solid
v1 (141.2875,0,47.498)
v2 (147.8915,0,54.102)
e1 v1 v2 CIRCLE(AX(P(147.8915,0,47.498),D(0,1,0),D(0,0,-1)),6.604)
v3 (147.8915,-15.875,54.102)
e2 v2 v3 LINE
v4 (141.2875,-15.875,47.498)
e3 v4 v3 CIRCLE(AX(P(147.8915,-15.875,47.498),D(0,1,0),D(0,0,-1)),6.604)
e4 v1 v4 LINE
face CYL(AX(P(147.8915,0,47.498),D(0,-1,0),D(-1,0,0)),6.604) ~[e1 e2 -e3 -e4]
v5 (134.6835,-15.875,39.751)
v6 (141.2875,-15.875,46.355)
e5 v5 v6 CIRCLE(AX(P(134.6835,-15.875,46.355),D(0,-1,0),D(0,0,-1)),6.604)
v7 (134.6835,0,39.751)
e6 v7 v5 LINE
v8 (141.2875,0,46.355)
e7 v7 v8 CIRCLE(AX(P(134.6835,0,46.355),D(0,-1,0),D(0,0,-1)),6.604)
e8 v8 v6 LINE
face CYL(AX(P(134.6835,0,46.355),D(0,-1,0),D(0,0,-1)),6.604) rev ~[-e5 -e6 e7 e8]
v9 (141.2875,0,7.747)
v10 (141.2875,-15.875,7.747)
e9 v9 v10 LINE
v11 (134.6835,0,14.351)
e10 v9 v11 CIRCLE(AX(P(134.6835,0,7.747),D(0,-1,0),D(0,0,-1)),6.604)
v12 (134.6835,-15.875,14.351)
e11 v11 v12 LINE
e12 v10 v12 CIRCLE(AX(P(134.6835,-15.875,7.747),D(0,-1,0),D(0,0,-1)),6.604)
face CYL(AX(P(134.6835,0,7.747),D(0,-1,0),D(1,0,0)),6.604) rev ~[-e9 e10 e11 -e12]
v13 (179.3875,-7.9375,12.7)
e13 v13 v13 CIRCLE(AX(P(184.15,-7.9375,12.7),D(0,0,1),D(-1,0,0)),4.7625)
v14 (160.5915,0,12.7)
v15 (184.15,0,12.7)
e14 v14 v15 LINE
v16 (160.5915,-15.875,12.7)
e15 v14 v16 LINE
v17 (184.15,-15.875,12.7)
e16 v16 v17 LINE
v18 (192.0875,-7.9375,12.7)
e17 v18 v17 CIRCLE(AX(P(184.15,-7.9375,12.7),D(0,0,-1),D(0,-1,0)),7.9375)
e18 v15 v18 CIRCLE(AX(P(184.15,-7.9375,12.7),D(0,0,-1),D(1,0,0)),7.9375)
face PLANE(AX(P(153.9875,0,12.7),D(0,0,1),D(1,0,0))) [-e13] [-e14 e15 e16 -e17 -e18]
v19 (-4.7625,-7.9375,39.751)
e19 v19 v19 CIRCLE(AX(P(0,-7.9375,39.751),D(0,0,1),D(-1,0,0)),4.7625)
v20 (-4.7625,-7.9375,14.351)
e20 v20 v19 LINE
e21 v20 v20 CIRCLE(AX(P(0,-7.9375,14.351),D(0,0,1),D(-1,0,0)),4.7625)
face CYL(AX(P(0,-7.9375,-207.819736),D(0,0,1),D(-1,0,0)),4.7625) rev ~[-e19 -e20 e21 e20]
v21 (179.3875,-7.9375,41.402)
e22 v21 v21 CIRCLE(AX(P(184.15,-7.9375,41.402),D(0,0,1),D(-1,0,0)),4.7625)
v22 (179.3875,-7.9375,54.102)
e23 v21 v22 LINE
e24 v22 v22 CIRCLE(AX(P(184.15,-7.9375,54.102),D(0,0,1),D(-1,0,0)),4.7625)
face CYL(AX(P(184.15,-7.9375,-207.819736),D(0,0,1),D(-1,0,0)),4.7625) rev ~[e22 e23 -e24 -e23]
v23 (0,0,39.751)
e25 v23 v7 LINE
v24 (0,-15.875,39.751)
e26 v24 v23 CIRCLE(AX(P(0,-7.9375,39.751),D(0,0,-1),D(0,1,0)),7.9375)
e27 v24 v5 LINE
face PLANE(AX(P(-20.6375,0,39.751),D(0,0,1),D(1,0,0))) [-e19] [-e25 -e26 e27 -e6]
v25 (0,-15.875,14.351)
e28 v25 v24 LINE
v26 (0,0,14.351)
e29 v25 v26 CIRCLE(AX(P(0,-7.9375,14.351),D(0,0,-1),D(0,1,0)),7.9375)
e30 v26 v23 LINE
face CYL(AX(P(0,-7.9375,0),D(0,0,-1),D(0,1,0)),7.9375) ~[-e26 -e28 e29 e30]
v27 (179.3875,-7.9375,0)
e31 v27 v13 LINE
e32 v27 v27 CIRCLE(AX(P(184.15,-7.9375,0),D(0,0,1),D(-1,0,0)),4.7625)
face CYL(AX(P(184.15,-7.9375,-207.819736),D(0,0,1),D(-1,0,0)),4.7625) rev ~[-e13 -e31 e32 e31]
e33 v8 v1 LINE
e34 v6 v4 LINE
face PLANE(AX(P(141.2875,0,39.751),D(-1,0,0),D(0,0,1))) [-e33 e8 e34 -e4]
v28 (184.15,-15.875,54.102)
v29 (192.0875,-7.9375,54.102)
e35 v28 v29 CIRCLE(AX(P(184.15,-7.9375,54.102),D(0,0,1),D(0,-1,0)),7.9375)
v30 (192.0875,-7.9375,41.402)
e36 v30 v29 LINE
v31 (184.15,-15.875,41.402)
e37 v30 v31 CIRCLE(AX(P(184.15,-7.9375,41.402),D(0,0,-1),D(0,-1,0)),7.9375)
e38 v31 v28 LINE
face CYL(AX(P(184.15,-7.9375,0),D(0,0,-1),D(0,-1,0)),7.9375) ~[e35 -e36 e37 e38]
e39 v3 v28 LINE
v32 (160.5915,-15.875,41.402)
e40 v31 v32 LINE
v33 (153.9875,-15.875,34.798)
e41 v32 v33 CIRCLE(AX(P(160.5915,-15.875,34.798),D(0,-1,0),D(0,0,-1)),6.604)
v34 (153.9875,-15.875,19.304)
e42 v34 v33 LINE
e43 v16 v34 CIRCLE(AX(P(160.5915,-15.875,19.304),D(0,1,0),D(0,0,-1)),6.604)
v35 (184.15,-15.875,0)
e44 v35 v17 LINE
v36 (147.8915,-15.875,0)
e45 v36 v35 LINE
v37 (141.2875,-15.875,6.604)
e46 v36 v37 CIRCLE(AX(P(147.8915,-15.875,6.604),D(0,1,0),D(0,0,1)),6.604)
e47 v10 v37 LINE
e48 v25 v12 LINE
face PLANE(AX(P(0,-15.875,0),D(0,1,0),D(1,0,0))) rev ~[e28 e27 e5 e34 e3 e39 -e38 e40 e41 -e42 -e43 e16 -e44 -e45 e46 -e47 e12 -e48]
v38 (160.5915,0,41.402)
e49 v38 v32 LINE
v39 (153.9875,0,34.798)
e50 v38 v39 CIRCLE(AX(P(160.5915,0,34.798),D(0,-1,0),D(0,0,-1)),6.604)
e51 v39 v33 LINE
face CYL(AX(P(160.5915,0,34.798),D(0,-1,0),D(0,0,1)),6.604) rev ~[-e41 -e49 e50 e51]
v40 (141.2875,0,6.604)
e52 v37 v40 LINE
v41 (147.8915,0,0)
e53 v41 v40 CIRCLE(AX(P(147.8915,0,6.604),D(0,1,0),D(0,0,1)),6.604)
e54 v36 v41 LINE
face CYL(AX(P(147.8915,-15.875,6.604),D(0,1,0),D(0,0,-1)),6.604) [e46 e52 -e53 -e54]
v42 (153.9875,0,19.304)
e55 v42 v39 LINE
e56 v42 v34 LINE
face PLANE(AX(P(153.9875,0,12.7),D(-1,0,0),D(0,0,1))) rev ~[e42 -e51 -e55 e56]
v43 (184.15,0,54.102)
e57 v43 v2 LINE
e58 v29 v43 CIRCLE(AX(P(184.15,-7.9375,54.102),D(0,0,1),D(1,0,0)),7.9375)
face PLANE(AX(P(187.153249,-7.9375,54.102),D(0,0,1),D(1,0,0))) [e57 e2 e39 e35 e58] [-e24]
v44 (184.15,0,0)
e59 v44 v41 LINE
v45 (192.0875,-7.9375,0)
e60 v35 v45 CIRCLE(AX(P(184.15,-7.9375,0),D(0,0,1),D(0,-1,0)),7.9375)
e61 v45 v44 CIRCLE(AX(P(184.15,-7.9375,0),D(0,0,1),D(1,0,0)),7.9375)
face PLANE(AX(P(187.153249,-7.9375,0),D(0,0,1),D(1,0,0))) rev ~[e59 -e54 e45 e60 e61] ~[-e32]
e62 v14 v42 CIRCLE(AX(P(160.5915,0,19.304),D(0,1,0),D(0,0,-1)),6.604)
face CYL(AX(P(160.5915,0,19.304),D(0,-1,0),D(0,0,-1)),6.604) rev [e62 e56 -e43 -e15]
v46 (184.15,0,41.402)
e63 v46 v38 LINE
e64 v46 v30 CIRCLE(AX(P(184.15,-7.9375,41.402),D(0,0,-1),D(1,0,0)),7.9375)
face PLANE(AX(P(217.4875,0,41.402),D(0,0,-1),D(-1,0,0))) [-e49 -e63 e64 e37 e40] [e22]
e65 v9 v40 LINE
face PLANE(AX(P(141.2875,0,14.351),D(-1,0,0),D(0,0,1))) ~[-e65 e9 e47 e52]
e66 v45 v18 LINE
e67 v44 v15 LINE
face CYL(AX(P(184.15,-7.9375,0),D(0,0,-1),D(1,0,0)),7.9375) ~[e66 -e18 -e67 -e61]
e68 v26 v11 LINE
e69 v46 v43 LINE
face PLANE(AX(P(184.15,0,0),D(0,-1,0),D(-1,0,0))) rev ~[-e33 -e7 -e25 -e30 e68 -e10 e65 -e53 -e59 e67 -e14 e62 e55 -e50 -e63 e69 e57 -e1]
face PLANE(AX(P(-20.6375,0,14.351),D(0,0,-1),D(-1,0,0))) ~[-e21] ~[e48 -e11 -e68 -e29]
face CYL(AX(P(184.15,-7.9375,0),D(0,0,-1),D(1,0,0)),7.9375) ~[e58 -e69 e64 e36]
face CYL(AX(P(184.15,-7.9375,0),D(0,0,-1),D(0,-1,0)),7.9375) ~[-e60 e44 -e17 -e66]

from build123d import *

# Parameters (mm, degrees)
F1_DEPTH = 54.102
F2_D     = 9.525
F3_W     = 25.4
F3_H     = 28.702
F3_W_2   = 38.1
F4_DEPTH = 25.4
F5_R     = 6.604
F6_W     = 141.2875
F6_H     = 14.351
F6_W_2   = 7.9375
F7_DEPTH = 25.4
F9_R     = 6.604


# Not quite as in the source:
# - a pattern or mirror of a feature is missing from the dataset's text; its kind, count and spacing are read off the source's solid


with BuildPart() as f1:
    # F0 (on Top) → F1 (new body)
    with BuildSketch(Plane.XY):
        with BuildLine():
            ThreePointArc((192.0875, -7.9375), (189.7626600757, -2.3248399243), (184.15, 0))
            Line((184.15, 0), (184.15, -15.875))
            ThreePointArc((184.15, -15.875), (189.7626600757, -13.5501600757), (192.0875, -7.9375))
        make_face()
        with BuildLine():
            Line((184.15, -15.875), (184.15, 0))
            ThreePointArc((184.15, 0), (176.2125, -7.9375), (184.15, -15.875))
        make_face()
        with BuildLine():
            Line((184.15, 0), (0, 0))
            ThreePointArc((0, 0), (5.6126600757, -2.3248399243), (7.9375, -7.9375))
            ThreePointArc((7.9375, -7.9375), (5.6126600757, -13.5501600757), (0, -15.875))
            Line((0, -15.875), (184.15, -15.875))
            ThreePointArc((184.15, -15.875), (176.2125, -7.9375), (184.15, 0))
        make_face()
        with BuildLine():
            ThreePointArc((7.9375, -7.9375), (5.6126600757, -2.3248399243), (0, 0))
            Line((0, 0), (0, -15.875))
            ThreePointArc((0, -15.875), (5.6126600757, -13.5501600757), (7.9375, -7.9375))
        make_face()
        with BuildLine():
            Line((0, -15.875), (0, 0))
            ThreePointArc((0, 0), (-7.9375, -7.9375), (0, -15.875))
        make_face()
    extrude(amount=F1_DEPTH)

    # F2 (through all)
    with Locations(Plane(origin=(0, 0, 0), x_dir=(1, 0, 0), z_dir=(0, 0, -1))):
        with Locations((0, 7.9375), (184.15, 7.9375)):
            Hole(F2_D / 2)

    # F3 (on Front) → F4 (cut)
    with BuildSketch(Plane.XZ):
        with Locations((204.7875, 27.051)):
            Rectangle(F3_W, F3_H)
        with Locations((173.0375, 27.051)):
            Rectangle(F3_W_2, F3_H)
    extrude(amount=F4_DEPTH, mode=Mode.SUBTRACT)

    # F5
    f5_edges = [f1.edges().sort_by_distance(p)[0] for p in [
        (153.9875, -7.9375, 41.402),
        (153.9875, -7.9375, 12.7),
    ]]
    fillet(f5_edges, radius=F5_R)

    # F6 (on Front) → F7 (cut)
    with BuildSketch(Plane.XZ):
        with Locations((70.64375, 46.9265)):
            Rectangle(F6_W, F6_H)
        with Locations((-3.96875, 46.9265)):
            Rectangle(F6_W_2, F6_H)
        Polygon((-20.6375, 39.751), (-7.9375, 39.751), (-7.9375, 54.102), (0, 54.102), (141.2875, 54.102), (141.2875, 66.802), (-20.6375, 66.802), align=None)
    f7 = extrude(amount=F7_DEPTH, mode=Mode.SUBTRACT)

    # F7_copies: F7 across plane
    add(f7.mirror(Plane(origin=(0, 0, 27.051), x_dir=(-1, 0, 0), z_dir=(0, 0, -1))), mode=Mode.SUBTRACT)

    # F9
    f9_edges = [f1.edges().sort_by_distance(p)[0] for p in [
        (141.2875, -7.9375, 39.751),
        (141.2875, -7.9375, 54.102),
        (141.2875, -7.9375, 0),
        (141.2875, -7.9375, 14.351),
    ]]
    fillet(f9_edges, radius=F9_R)


solid = f1.part
